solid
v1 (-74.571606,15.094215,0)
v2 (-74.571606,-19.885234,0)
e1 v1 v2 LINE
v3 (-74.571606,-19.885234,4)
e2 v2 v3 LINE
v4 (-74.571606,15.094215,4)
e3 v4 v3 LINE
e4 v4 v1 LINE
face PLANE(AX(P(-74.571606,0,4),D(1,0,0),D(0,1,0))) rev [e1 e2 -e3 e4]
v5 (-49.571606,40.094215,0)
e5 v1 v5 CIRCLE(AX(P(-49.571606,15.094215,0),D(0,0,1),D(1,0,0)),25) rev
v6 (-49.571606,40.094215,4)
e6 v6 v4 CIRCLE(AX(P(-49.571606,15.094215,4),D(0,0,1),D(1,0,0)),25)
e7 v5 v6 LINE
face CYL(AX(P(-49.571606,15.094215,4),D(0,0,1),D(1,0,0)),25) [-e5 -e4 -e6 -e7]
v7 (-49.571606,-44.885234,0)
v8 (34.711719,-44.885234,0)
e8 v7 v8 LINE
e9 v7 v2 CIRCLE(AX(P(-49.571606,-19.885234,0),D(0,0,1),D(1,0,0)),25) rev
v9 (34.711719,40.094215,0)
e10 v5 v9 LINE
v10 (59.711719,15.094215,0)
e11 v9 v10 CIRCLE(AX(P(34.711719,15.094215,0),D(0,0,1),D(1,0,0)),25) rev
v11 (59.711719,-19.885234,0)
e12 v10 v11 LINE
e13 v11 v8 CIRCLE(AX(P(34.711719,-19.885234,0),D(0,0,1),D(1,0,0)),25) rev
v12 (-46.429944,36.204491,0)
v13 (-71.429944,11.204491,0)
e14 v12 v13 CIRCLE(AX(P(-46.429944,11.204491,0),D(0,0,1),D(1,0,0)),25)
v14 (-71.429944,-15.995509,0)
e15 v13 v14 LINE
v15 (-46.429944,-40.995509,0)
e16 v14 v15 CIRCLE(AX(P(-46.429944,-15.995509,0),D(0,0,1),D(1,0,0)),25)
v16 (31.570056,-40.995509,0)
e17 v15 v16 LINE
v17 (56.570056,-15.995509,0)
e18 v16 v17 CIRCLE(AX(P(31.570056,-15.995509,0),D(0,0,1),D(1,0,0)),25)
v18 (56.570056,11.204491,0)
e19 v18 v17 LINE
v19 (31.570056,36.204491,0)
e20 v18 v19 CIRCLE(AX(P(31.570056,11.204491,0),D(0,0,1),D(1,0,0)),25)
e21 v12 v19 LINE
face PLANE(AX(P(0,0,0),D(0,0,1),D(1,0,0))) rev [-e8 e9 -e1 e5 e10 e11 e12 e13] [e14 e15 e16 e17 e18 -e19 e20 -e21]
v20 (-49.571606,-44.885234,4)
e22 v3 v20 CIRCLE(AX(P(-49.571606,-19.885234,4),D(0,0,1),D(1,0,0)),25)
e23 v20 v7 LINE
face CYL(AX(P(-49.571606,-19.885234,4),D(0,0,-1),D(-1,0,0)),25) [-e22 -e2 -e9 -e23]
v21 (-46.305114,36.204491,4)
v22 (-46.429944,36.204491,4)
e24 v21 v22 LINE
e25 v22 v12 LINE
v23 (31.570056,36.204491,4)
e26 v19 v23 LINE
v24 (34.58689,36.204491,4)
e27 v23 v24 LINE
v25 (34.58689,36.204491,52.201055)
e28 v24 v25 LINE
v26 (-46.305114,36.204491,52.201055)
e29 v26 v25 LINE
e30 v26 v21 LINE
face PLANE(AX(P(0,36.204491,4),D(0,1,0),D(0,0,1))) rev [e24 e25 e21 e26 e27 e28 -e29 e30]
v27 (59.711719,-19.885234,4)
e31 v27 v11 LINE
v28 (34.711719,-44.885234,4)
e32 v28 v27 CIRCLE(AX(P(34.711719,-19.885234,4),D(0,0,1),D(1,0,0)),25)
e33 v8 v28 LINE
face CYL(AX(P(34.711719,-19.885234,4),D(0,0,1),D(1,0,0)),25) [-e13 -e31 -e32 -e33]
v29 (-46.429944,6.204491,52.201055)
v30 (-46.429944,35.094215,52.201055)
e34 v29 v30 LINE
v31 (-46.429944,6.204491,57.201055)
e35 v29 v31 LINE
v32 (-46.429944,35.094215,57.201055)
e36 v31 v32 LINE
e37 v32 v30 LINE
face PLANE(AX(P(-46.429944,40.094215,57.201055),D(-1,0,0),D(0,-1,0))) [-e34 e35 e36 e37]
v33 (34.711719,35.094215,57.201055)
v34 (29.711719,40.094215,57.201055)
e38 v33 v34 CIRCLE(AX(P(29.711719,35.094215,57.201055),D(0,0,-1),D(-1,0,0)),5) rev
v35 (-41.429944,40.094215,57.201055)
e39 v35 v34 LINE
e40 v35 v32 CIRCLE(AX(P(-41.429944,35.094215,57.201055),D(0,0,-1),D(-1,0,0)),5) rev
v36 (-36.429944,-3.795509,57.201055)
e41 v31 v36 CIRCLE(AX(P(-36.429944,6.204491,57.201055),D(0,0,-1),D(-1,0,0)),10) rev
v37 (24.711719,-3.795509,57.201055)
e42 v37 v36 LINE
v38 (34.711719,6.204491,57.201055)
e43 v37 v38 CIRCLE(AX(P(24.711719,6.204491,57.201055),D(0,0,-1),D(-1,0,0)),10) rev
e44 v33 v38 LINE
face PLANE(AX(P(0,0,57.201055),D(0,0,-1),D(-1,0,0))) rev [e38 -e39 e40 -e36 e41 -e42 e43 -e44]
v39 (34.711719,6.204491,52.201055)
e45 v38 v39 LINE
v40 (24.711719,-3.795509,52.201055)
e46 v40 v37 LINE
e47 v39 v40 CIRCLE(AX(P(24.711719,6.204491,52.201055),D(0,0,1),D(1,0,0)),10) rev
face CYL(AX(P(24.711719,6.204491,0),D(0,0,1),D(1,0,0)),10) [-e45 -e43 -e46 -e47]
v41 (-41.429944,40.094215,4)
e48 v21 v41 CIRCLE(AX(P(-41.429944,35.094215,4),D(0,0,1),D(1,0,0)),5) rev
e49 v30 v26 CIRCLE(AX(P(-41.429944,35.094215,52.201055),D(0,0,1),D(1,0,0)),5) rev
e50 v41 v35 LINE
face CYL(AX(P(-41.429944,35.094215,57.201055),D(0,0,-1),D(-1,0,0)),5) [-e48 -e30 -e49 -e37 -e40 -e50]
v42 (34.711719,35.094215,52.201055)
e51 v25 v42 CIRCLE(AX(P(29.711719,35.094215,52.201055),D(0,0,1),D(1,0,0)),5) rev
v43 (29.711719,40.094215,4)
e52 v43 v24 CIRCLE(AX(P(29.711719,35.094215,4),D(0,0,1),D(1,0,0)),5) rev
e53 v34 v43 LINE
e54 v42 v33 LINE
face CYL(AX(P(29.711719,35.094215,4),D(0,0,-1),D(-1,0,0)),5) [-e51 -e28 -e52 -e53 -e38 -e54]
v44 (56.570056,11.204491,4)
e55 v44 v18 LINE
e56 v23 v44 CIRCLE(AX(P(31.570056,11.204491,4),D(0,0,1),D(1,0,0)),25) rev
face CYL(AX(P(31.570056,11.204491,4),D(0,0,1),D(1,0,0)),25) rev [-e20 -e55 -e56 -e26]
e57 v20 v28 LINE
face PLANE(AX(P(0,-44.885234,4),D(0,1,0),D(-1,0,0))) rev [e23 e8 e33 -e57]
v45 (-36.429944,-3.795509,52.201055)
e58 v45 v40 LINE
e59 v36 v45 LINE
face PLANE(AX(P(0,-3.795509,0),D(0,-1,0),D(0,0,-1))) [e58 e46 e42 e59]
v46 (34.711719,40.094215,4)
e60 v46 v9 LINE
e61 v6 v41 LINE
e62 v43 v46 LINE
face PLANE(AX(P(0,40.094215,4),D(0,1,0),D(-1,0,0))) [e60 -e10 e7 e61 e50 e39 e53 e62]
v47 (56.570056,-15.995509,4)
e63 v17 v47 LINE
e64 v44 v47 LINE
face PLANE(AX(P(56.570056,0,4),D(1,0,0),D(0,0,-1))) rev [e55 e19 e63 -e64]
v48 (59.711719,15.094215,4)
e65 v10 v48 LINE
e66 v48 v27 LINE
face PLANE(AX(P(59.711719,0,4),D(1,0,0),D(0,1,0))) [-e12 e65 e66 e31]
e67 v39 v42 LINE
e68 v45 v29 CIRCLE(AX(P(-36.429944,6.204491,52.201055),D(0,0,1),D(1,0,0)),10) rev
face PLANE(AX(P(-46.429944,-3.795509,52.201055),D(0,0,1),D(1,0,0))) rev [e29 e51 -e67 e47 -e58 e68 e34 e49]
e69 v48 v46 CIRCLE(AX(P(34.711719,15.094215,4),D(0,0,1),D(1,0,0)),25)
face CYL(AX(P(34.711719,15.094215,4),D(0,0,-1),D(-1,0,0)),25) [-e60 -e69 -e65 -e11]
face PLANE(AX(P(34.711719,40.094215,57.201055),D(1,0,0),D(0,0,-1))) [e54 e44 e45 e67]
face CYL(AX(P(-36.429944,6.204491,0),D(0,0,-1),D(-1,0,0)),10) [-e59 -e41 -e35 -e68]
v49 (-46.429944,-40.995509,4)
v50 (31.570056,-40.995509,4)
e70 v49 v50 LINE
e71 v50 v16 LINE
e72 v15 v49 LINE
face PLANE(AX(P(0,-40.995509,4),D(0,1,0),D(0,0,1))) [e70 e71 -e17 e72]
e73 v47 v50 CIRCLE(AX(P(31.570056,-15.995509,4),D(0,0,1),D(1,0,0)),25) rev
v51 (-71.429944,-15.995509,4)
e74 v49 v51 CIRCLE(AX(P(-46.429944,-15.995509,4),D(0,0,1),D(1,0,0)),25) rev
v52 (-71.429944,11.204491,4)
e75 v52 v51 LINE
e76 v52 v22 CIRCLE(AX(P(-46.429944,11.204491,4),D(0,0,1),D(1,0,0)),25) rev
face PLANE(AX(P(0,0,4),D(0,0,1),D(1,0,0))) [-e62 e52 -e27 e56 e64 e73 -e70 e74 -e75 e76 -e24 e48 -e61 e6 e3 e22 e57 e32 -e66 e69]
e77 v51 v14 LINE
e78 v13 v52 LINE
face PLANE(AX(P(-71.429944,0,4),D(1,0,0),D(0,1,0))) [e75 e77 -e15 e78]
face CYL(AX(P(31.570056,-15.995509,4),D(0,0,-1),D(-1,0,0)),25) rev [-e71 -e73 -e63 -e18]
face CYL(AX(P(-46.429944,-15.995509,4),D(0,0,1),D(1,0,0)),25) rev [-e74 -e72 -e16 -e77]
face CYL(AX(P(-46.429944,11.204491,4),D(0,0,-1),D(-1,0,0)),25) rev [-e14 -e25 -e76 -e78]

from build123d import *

# Parameters (mm, degrees)
BOSS_EXTRUDE1_DEPTH = 4
FILLET1_R           = 25
SKETCH3_W           = 81.141662503
SKETCH3_H           = 3.889724504
BOSS_EXTRUDE3_DEPTH = 57.201055289
SKETCH4_W           = 81.141662503
SKETCH4_H           = 5
BOSS_EXTRUDE4_DEPTH = 40
FILLET2_R           = 10
FILLET3_R           = 5


with BuildPart() as part:
    # Sketch1 → Boss-Extrude1 (new body)
    with BuildSketch(Plane.XY):
        Polygon((-71.429943593, 36.204490704), (56.570056407, 36.204490704), (59.71171891, 40.094215208), (-74.571606096, 40.094215208), align=None)
        Polygon((56.570056407, 36.204490704), (56.570056407, -40.995509296), (59.71171891, -44.8852338), (59.71171891, 40.094215208), align=None)
        Polygon((56.570056407, -40.995509296), (59.71171891, -44.8852338), (-74.571606096, -44.8852338), (-74.571606096, 40.094215208), (-71.429943593, 36.204490704), (-71.429943593, -40.995509296), align=None)
    extrude(amount=BOSS_EXTRUDE1_DEPTH)

    # Fillet1
    fillet1_edges = [part.edges().sort_by_distance(p)[0] for p in [
        (-71.429943593, 36.204490704, 2),
        (-71.429943593, -40.995509296, 2),
        (56.570056407, -40.995509296, 2),
        (56.570056407, 36.204490704, 2),
        (-74.571606096, -44.8852338, 2),
        (-74.571606096, 40.094215208, 2),
        (59.71171891, 40.094215208, 2),
        (59.71171891, -44.8852338, 2),
    ]]
    fillet(fillet1_edges, radius=FILLET1_R)

    # Sketch3 → Boss-Extrude3 (add)
    with BuildSketch(Plane(origin=(0, 0, 0), x_dir=(-1, 0, 0), z_dir=(0, 0, -1))):
        with Locations((5.859112342, 38.149352956)):
            Rectangle(SKETCH3_W, SKETCH3_H)
    extrude(amount=-BOSS_EXTRUDE3_DEPTH)

    # Sketch4 → Boss-Extrude4 (add)
    with BuildSketch(Plane(origin=(0, 36.204490704, 0), x_dir=(-1, 0, 0), z_dir=(0, -1, 0))):
        with Locations((5.859112342, -54.701055289)):
            Rectangle(SKETCH4_W, SKETCH4_H)
    extrude(amount=BOSS_EXTRUDE4_DEPTH)

    # Fillet2
    fillet2_edges = [part.edges().sort_by_distance(p)[0] for p in [
        (-46.429943593, -3.795509296, 54.701055289),
        (34.71171891, -3.795509296, 54.701055289),
    ]]
    fillet(fillet2_edges, radius=FILLET2_R)

    # Fillet3
    # the kernel refuses this fillet: 5 mm, written as the material it takes off along each edge
    with BuildSketch(Plane(origin=(34.71171891, 40.094215208, 4), x_dir=(-1, 0, 0), z_dir=(0, 0, 1)), Plane(origin=(-46.429943593, 40.094215208, 4), x_dir=(0, -1, 0), z_dir=(0, 0, 1))) as fillet3_piece_1:
        with BuildLine():
            CenterArc((FILLET3_R, FILLET3_R), FILLET3_R, 180, 90)
            Line((0, FILLET3_R), (0, 0))
            Line((0, 0), (FILLET3_R, 0))
        make_face()
    extrude(amount=65.701055289, mode=Mode.SUBTRACT)


solid = part.part
